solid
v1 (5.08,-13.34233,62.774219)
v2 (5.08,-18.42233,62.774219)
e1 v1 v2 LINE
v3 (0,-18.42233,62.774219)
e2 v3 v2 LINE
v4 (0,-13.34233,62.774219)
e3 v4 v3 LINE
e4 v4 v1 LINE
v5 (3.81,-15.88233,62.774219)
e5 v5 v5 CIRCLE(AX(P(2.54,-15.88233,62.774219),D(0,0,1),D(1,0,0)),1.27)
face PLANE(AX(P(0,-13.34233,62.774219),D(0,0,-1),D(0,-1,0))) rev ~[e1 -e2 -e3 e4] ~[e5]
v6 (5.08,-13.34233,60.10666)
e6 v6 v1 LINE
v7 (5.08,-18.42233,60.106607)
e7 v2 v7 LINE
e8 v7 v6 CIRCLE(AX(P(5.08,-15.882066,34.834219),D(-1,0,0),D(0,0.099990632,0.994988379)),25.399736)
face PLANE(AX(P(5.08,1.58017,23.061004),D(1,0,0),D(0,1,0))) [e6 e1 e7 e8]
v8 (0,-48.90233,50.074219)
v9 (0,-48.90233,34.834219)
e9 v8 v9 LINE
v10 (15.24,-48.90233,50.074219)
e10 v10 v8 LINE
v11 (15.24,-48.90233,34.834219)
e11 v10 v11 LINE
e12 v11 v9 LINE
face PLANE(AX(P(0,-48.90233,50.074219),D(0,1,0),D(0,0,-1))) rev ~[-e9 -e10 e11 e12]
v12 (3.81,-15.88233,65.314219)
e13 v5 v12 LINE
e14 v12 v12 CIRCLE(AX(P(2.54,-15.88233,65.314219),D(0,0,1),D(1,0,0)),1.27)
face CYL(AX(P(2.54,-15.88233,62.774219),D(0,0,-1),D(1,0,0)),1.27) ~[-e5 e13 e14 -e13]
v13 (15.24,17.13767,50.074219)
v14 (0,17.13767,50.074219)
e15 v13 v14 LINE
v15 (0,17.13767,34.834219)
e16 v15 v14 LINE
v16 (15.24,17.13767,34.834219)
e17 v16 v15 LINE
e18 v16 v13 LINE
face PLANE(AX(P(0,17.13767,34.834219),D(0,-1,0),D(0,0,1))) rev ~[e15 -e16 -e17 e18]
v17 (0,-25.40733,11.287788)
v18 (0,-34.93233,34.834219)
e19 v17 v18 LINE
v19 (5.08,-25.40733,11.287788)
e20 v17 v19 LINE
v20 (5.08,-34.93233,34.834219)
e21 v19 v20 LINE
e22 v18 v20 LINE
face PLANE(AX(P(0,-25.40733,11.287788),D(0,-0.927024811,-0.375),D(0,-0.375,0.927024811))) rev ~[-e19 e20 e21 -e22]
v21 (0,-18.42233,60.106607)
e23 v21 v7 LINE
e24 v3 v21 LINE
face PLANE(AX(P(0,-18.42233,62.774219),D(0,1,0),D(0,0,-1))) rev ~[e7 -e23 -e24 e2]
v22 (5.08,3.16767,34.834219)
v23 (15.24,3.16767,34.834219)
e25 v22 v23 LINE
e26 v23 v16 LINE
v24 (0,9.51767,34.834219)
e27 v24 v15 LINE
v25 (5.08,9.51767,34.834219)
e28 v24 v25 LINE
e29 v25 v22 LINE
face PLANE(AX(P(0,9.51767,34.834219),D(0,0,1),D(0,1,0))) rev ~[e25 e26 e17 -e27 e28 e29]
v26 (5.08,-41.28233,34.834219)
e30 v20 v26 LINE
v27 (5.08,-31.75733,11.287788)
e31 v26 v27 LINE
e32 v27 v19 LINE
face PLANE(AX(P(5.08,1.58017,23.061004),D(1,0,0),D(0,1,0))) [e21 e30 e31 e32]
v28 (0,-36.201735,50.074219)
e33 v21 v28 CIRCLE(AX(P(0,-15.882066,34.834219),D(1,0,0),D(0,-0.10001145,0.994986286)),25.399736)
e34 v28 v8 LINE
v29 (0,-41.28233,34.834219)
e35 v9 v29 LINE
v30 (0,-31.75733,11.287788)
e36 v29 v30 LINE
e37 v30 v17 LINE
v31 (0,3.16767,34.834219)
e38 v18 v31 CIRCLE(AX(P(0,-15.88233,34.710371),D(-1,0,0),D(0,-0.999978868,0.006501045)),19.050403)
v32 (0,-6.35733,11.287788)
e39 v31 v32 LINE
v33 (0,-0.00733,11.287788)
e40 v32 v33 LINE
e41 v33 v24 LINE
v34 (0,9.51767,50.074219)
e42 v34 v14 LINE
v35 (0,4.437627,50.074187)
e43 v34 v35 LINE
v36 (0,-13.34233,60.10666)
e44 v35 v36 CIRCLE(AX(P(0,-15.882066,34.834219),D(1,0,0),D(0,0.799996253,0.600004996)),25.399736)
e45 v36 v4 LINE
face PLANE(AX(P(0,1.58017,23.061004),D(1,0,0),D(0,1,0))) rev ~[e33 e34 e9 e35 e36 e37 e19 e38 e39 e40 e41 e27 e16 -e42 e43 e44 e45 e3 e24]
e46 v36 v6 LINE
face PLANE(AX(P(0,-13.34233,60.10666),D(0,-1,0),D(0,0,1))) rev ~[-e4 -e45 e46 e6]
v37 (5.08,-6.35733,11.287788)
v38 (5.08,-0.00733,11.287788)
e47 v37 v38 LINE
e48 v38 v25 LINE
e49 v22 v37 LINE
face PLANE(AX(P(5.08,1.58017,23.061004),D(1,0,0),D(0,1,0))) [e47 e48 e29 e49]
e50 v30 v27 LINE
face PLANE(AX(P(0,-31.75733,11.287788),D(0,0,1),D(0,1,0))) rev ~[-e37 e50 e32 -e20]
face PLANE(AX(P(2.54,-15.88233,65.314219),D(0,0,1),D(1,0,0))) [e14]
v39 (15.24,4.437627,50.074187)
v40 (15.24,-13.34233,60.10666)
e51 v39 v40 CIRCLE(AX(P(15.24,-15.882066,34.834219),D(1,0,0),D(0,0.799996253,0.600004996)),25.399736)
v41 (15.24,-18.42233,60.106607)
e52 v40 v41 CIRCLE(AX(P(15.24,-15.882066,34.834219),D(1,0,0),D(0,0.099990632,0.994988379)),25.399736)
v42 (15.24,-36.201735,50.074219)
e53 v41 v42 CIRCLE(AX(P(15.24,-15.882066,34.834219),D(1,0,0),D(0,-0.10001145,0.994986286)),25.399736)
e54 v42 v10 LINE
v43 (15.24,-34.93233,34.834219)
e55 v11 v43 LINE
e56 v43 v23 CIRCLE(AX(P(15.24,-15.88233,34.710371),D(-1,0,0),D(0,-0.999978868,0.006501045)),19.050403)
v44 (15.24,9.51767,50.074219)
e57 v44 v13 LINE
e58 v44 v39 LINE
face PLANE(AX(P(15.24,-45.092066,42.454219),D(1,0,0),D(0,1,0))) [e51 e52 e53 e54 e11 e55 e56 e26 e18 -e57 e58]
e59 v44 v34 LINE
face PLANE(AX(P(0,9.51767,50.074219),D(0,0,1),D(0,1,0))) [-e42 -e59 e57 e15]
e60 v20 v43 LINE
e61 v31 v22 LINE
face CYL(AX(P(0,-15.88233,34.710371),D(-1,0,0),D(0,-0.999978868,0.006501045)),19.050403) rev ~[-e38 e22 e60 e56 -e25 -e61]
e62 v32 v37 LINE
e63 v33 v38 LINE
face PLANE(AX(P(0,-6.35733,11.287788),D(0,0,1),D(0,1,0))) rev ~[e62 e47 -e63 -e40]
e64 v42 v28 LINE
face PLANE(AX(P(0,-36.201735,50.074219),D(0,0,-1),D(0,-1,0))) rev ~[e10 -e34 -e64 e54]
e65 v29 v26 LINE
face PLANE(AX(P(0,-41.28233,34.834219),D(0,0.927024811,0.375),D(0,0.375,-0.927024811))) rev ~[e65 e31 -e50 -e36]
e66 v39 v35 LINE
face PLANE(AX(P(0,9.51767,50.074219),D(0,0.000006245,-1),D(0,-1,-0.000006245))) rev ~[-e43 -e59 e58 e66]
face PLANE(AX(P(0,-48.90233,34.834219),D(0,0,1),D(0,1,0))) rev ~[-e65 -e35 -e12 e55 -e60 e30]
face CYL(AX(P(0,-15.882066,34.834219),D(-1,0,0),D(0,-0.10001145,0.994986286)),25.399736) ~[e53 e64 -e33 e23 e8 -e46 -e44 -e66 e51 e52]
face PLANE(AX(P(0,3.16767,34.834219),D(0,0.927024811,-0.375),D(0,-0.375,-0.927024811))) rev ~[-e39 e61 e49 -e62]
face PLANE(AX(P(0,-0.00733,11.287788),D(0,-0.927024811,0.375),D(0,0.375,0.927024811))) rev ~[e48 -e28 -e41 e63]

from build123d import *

# Parameters (mm, degrees)
F0_W     = 7.62
F0_H     = 15.24
F1_DEPTH = 5.08
F2_R     = 1.27
F3_DEPTH = 2.54
F4_DEPTH = 15.24


# Not quite as in the source:
# - ends of sketch curves that miss each other by under 0.0002 mm in the source are joined


with BuildPart() as f1:
    # F0 (on Right) → F1 (new body)
    with BuildSketch(Plane.YZ):
        Polygon((9.5176697043, 34.8342186189), (3.1676697043, 34.8342186189), (-6.3573302957, 11.2877884223), (-0.0073302957, 11.2877884223), align=None)
        with BuildLine():
            ThreePointArc((4.4376274036, 50.074186893), (8.2142139606, 42.8663955151), (9.5176697043, 34.8342186189))
            Line((9.5176697043, 34.8342186189), (9.5176697043, 50.0742186189))
            Line((9.5176697043, 50.0742186189), (4.4376274036, 50.074186893))
        make_face()
        with Locations((13.3276697043, 42.4542186189)):
            Rectangle(F0_W, F0_H)
        Polygon((-48.9023302957, 50.0742186189), (-48.9023302957, 34.8342186189), (-41.2823302957, 34.8342186189), (-41.28180154, 34.8342186189), (-41.28180154, 50.0742186189), align=None)
        with BuildLine():
            Line((-41.28180154, 50.0742186189), (-41.28180154, 34.8342186189))
            ThreePointArc((-41.28180154, 34.8342186189), (-39.9783395258, 42.8664143264), (-36.2017354445, 50.0742186189))
            Line((-36.2017354445, 50.0742186189), (-41.28180154, 50.0742186189))
        make_face()
        Polygon((-41.28180154, 34.8342186189), (-41.2823302957, 34.8342186189), (-31.7573302957, 11.2877884223), (-25.4073302957, 11.2877884223), (-34.9323302957, 34.8342186189), align=None)
        with BuildLine():
            ThreePointArc((-13.3423302957, 60.1066603814), (-15.8823316277, 60.2339542396), (-18.4223302957, 60.1066072389))
            Line((-18.4223302957, 60.1066072389), (-18.4223302957, 57.6942186189))
            Line((-18.4223302957, 57.6942186189), (-13.3423302957, 57.6942186189))
            Line((-13.3423302957, 57.6942186189), (-13.3423302957, 60.1066603814))
        make_face()
        with BuildLine():
            Line((-18.4223302957, 62.7742186189), (-18.4223302957, 60.1066072389))
            ThreePointArc((-18.4223302957, 60.1066072389), (-15.8823316277, 60.2339542396), (-13.3423302957, 60.1066603814))
            Line((-13.3423302957, 60.1066603814), (-13.3423302957, 62.7742186189))
            Line((-13.3423302957, 62.7742186189), (-18.4223302957, 62.7742186189))
        make_face()
        with BuildLine():
            ThreePointArc((-36.2017354445, 50.0742186189), (-39.9783395258, 42.8664143264), (-41.28180154, 34.8342186189))
            Line((-41.28180154, 34.8342186189), (-34.9323302957, 34.8342186189))
            ThreePointArc((-34.9323302957, 34.8342186189), (-15.8823302957, 53.7607736673), (3.1676697043, 34.8342186189))
            Line((3.1676697043, 34.8342186189), (9.5176697043, 34.8342186189))
            ThreePointArc((9.5176697043, 34.8342186189), (8.2142139606, 42.8663955151), (4.4376274036, 50.074186893))
            ThreePointArc((4.4376274036, 50.074186893), (-3.4000386794, 56.9553751368), (-13.3423302957, 60.1066603814))
            Line((-13.3423302957, 60.1066603814), (-13.3423302957, 57.6942186189))
            Line((-13.3423302957, 57.6942186189), (-18.4223302957, 57.6942186189))
            Line((-18.4223302957, 57.6942186189), (-18.4223302957, 60.1066072389))
            ThreePointArc((-18.4223302957, 60.1066072389), (-28.3643072986, 56.9552543041), (-36.2017354445, 50.0742186189))
        make_face()
    extrude(amount=F1_DEPTH)

    # F2 (on face) → F3 (join)
    with BuildSketch(Plane.XY.offset(62.7742186189)):
        with Locations((2.54, -15.8823302957)):
            Circle(F2_R)
    extrude(amount=F3_DEPTH)

    # F0 (on Right) → F4 (join)
    with BuildSketch(Plane.YZ):
        Polygon((-48.9023302957, 50.0742186189), (-48.9023302957, 34.8342186189), (-41.2823302957, 34.8342186189), (-41.28180154, 34.8342186189), (-41.28180154, 50.0742186189), align=None)
        with BuildLine():
            Line((-41.28180154, 50.0742186189), (-41.28180154, 34.8342186189))
            ThreePointArc((-41.28180154, 34.8342186189), (-39.9783395258, 42.8664143264), (-36.2017354445, 50.0742186189))
            Line((-36.2017354445, 50.0742186189), (-41.28180154, 50.0742186189))
        make_face()
        with BuildLine():
            ThreePointArc((-36.2017354445, 50.0742186189), (-39.9783395258, 42.8664143264), (-41.28180154, 34.8342186189))
            Line((-41.28180154, 34.8342186189), (-34.9323302957, 34.8342186189))
            ThreePointArc((-34.9323302957, 34.8342186189), (-15.8823302957, 53.7607736673), (3.1676697043, 34.8342186189))
            Line((3.1676697043, 34.8342186189), (9.5176697043, 34.8342186189))
            ThreePointArc((9.5176697043, 34.8342186189), (8.2142139606, 42.8663955151), (4.4376274036, 50.074186893))
            ThreePointArc((4.4376274036, 50.074186893), (-3.4000386794, 56.9553751368), (-13.3423302957, 60.1066603814))
            Line((-13.3423302957, 60.1066603814), (-13.3423302957, 57.6942186189))
            Line((-13.3423302957, 57.6942186189), (-18.4223302957, 57.6942186189))
            Line((-18.4223302957, 57.6942186189), (-18.4223302957, 60.1066072389))
            ThreePointArc((-18.4223302957, 60.1066072389), (-28.3643072986, 56.9552543041), (-36.2017354445, 50.0742186189))
        make_face()
        with BuildLine():
            ThreePointArc((4.4376274036, 50.074186893), (8.2142139606, 42.8663955151), (9.5176697043, 34.8342186189))
            Line((9.5176697043, 34.8342186189), (9.5176697043, 50.0742186189))
            Line((9.5176697043, 50.0742186189), (4.4376274036, 50.074186893))
        make_face()
        with Locations((13.3276697043, 42.4542186189)):
            Rectangle(F0_W, F0_H)
        with BuildLine():
            ThreePointArc((-13.3423302957, 60.1066603814), (-15.8823316277, 60.2339542396), (-18.4223302957, 60.1066072389))
            Line((-18.4223302957, 60.1066072389), (-18.4223302957, 57.6942186189))
            Line((-18.4223302957, 57.6942186189), (-13.3423302957, 57.6942186189))
            Line((-13.3423302957, 57.6942186189), (-13.3423302957, 60.1066603814))
        make_face()
    extrude(amount=F4_DEPTH)


solid = f1.part
